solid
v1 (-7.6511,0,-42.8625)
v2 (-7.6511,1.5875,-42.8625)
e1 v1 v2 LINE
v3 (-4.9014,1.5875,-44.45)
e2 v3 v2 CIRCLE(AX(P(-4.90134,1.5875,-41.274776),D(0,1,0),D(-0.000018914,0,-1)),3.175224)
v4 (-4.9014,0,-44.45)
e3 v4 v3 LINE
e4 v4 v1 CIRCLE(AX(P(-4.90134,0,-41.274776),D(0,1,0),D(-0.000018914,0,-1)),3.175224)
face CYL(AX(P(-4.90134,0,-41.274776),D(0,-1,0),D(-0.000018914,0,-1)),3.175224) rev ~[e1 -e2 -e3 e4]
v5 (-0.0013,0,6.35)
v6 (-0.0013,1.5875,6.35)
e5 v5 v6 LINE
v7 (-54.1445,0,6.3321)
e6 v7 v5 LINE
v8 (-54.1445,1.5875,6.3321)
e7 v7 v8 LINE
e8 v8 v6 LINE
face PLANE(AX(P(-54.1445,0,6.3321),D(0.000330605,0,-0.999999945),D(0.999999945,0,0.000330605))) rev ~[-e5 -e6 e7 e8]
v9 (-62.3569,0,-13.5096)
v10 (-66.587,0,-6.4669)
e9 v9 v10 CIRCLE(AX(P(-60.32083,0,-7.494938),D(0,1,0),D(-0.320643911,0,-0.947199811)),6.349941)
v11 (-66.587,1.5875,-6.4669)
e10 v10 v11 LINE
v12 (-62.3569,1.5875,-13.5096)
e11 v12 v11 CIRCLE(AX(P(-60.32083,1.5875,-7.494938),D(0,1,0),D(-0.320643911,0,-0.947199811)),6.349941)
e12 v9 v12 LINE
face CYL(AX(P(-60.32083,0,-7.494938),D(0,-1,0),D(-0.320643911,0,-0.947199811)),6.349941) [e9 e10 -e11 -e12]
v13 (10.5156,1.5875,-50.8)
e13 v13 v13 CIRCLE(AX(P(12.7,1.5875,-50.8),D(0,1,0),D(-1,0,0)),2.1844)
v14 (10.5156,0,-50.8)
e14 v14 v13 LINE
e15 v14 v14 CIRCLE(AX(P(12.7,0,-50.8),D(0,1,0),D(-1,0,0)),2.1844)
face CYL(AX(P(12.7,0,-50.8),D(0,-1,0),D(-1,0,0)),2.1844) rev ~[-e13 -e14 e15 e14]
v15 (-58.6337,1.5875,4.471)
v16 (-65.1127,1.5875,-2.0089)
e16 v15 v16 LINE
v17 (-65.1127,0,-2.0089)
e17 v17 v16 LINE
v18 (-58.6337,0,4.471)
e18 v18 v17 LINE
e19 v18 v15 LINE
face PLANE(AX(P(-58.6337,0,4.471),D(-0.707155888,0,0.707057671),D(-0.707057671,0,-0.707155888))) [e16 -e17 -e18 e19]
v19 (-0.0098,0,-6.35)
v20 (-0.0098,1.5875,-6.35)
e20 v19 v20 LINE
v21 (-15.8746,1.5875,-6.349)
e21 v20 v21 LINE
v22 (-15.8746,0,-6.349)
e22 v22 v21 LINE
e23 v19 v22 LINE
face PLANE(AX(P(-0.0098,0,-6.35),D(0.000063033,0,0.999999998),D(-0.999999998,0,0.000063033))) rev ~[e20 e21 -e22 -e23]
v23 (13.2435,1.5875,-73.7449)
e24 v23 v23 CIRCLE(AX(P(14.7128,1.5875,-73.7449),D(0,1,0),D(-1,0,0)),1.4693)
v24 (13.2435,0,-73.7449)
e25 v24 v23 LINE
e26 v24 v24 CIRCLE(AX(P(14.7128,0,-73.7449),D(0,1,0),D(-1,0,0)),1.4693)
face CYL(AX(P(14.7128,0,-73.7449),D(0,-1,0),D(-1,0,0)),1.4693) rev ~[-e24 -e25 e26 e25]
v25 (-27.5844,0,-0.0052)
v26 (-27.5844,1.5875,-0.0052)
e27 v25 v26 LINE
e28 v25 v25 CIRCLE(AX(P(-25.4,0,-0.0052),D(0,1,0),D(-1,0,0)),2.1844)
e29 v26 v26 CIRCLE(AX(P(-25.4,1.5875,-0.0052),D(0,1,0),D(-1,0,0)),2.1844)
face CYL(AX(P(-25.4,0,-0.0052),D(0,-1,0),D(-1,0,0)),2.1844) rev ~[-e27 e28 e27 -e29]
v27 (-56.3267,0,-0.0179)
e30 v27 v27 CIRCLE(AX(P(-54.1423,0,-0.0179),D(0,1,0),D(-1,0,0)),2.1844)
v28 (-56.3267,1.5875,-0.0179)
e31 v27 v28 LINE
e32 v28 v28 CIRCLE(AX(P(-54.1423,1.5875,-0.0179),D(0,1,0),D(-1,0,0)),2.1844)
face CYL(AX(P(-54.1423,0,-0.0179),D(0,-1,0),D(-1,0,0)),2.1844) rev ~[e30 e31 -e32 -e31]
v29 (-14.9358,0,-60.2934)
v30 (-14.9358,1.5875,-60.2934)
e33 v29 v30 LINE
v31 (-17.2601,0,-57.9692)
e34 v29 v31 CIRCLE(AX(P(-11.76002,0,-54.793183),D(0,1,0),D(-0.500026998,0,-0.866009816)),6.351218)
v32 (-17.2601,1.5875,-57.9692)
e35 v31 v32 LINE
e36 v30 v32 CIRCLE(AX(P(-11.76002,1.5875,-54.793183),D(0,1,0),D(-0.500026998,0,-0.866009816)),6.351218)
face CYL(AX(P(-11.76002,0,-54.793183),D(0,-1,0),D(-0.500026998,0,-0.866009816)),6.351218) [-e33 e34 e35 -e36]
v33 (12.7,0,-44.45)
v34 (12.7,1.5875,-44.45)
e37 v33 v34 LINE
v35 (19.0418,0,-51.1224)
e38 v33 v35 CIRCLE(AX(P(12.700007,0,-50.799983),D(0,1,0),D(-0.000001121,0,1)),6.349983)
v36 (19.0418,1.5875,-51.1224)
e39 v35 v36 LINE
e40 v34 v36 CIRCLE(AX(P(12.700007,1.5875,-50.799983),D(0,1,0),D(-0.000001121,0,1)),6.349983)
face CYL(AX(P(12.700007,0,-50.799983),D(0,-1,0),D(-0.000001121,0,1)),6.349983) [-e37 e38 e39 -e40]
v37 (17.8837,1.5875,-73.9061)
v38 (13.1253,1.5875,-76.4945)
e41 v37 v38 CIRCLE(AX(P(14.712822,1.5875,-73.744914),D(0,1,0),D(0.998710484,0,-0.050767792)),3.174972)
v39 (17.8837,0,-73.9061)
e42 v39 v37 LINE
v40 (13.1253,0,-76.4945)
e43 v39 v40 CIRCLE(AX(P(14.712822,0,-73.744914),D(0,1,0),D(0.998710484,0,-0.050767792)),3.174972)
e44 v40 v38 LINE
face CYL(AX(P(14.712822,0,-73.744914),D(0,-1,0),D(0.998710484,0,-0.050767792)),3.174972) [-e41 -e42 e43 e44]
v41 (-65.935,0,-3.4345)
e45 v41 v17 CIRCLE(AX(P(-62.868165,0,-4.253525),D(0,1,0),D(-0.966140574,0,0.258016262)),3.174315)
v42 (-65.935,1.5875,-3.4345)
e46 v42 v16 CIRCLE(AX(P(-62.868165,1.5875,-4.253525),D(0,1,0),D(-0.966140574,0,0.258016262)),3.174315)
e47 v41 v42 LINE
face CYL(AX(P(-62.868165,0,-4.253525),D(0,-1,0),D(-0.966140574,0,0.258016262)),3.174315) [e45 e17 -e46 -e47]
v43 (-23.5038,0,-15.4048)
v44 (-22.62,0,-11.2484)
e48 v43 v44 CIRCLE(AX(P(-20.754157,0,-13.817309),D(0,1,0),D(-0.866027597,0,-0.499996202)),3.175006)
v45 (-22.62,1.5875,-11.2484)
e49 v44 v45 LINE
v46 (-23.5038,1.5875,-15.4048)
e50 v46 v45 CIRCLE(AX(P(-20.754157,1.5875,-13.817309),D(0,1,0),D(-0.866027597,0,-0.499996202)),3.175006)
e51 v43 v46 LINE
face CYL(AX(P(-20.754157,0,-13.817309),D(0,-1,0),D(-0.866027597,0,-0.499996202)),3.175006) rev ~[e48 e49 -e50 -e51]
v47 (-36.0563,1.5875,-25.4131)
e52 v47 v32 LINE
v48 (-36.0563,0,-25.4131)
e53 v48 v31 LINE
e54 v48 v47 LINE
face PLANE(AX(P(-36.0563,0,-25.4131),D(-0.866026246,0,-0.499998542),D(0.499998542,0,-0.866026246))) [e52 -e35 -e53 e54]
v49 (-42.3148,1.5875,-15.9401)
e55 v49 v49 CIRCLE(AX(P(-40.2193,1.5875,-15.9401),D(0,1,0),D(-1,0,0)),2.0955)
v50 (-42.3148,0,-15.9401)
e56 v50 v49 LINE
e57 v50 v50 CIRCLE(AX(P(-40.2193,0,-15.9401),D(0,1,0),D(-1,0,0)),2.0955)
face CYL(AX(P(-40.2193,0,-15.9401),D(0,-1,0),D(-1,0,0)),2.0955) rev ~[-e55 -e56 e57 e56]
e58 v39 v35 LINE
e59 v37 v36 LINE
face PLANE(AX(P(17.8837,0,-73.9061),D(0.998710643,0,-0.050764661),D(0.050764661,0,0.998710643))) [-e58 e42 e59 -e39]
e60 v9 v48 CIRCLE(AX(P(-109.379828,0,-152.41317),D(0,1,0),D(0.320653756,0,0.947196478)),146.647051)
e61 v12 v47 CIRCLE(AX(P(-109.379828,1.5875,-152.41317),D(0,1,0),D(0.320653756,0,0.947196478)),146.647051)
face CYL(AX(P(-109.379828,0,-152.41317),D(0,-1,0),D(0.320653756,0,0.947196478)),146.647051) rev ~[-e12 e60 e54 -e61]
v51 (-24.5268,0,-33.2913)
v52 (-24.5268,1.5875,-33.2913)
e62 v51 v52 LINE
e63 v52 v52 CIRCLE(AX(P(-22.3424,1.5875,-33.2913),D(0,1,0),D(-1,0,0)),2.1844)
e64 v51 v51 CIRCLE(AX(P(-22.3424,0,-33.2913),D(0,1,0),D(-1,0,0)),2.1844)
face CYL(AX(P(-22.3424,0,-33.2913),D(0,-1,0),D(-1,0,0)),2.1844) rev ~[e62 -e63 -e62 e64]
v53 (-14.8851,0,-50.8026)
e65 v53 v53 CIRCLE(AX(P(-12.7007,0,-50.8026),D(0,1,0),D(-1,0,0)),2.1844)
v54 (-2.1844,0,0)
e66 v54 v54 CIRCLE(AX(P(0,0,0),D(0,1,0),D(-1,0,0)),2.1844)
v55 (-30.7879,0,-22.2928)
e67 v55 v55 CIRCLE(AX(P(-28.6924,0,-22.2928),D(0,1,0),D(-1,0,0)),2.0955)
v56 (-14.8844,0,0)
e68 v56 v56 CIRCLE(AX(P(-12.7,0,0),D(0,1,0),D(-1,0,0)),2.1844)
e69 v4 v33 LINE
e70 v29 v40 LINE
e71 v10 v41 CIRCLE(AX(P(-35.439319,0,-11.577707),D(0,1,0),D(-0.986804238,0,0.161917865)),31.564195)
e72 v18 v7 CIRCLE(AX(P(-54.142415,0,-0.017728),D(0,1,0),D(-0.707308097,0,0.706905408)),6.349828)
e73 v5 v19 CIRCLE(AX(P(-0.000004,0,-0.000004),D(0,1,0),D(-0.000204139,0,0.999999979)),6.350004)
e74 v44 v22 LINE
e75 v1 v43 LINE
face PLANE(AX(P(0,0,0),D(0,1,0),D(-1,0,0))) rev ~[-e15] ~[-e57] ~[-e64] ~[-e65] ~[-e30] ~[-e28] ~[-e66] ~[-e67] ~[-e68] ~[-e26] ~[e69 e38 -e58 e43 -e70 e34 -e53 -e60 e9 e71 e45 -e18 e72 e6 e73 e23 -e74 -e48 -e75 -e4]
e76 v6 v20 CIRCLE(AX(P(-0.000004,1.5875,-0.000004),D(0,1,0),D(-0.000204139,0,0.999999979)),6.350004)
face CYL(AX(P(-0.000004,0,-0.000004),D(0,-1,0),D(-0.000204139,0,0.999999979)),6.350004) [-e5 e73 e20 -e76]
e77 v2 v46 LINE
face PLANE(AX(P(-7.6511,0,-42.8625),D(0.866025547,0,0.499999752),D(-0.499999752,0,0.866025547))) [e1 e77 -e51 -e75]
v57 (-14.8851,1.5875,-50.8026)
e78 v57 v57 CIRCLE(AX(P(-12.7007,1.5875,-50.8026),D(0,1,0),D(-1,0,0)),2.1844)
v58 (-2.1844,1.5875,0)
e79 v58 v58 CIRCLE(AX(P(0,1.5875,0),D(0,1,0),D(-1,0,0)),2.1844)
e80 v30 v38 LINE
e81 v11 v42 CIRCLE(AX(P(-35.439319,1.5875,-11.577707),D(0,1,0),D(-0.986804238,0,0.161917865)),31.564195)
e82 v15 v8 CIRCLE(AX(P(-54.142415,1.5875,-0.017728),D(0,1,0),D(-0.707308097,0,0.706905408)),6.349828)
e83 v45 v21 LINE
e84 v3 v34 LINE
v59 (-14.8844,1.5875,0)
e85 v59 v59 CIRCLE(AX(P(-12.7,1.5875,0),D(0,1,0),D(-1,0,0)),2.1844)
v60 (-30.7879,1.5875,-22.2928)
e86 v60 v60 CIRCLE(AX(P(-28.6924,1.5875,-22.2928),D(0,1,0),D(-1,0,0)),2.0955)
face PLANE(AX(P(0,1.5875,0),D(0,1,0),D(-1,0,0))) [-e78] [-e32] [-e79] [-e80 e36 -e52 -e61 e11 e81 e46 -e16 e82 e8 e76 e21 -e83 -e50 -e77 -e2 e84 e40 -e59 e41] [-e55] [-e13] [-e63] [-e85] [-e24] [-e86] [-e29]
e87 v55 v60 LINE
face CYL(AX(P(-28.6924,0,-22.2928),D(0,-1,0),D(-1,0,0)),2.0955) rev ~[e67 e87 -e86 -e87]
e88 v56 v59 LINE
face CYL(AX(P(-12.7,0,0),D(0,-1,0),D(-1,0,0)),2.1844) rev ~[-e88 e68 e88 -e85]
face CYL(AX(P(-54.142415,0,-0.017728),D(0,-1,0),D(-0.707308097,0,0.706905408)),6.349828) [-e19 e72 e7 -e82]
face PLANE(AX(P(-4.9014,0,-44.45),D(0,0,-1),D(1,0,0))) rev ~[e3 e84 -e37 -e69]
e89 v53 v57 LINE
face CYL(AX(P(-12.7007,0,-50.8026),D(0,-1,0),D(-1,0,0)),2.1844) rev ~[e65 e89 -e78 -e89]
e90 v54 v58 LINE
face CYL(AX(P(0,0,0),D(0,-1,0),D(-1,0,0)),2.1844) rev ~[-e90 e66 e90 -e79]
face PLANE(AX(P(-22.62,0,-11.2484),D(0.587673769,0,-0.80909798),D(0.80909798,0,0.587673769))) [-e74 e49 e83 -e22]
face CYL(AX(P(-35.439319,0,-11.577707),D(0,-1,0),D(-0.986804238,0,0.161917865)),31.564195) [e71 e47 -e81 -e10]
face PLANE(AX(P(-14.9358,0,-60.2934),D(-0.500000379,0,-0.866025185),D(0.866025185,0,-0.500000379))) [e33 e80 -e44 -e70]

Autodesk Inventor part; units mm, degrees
ref_plane "YZ Plane" through (0, 0, 0) normal (1, 0, 0) x (0, 1, 0)
ref_plane "XZ Plane" through (0, 0, 0) normal (0, 1, 0) x (-1, 0, 0)
ref_plane "XY Plane" through (0, 0, 0) normal (0, 0, 1) x (1, 0, 0)
sketch "main" plane through (0, 0, 0) normal (0, 0, 1) x (1, 0, 0)
  circle A0 centre (36.4896, 64.2776) radius 2.1844
  line L0 (36.4904, 70.6276) -> (-17.6528, 70.6344)
  circle A1 centre (7.7473, 64.2844) radius 2.1844
  line L1 (-17.6416, 57.9344) -> (-1.7768, 57.9386)
  arc A2 (-17.6528, 70.6344) -> (-17.6416, 57.9344) centre (-17.6528, 64.2844) ccw
  circle A3 centre (-17.6528, 64.2844) radius 2.1844
  arc A4 (40.98, 68.7674) -> (36.4904, 70.6276) centre (36.4896, 64.2776) ccw
  line L2 (40.98, 68.7674) -> (49.8505, 68.7674) construction
  circle A5 centre (-4.9416, 13.4844) radius 2.1844
  circle A6 centre (-4.9528, 64.287) radius 2.1844
  point P0 (10.5119, 26.5593)
  point P1 (34.4277, 26.6577)
  dimension "d2" = 4.3688
  dimension "d3" = 4.3688
  dimension "d13" = 6.35
  dimension "d78" = 4.3688
sketch "mogo" plane through (0, 0, 0) normal (0, 0, 1) x (1, 0, 0)
  line L0 (-61.3822, 498.7735) -> (65.6178, 572.097)
  line L1 (65.6178, 572.097) -> (192.6178, 498.7735)
  line L2 (192.6178, 498.7735) -> (192.6178, 352.1265)
  line L3 (192.6178, 352.1265) -> (65.6178, 278.803)
  line L4 (65.6178, 278.803) -> (-61.3822, 352.1265)
  line L5 (-61.3822, 352.1265) -> (-61.3822, 498.7735)
  point P0 (65.6178, 425.45)
  point P1 (65.6178, 425.45)
  dimension "d59" = 254
sketch "Sketch1" plane through (0, 0, 0) normal (0, 1, 0) x (-1, 0, 0)
  line L0 (58.6337, 4.471) -> (65.1127, -2.0089)
  arc A0 (65.935, -3.4345) -> (65.1127, -2.0089) centre (62.8675, -4.2538) ccw
  circle A1 centre (22.3424, -33.2913) radius 2.1844
  arc A2 (66.587, -6.4669) -> (65.935, -3.4345) centre (35.461, -11.5736) ccw
  arc A3 (62.3569, -13.5096) -> (66.587, -6.4669) centre (60.3208, -7.4949) ccw
  line L1 (31.7488, -5.4171) -> (31.751, 4.6095) projected
  arc A4 (62.3569, -13.5096) -> (36.0563, -25.4131) centre (109.3798, -152.4131) ccw
  line L2 (36.0563, -25.4131) -> (17.2601, -57.9692)
  line L3 (7.6511, -42.8625) -> (23.5038, -15.4048)
  line L4 (49.7771, -4.633) -> (49.6408, -4.4967)
  line L5 (4.9014, -44.45) -> (-12.7, -44.45)
  line L6 (-17.8837, -73.9061) -> (-19.0418, -51.1224)
  line L7 (14.9358, -60.2934) -> (-13.1253, -76.4945)
  circle A5 centre (-12.7, -50.8) radius 2.1844
  arc A6 (-12.7, -44.45) -> (-19.0418, -51.1224) centre (-12.7, -50.8) ccw
  arc A7 (-17.8837, -73.9061) -> (-13.1253, -76.4945) centre (-14.7128, -73.7449) ccw
  circle A8 centre (-14.7128, -73.7449) radius 1.4693
  arc A9 (14.9358, -60.2934) -> (17.2601, -57.9692) centre (11.7608, -54.7942) ccw
  circle A10 centre (28.6924, -22.2928) radius 2.0955
  line L8 (22.62, -11.2484) -> (15.8746, -6.349)
  arc A11 (23.5038, -15.4048) -> (22.62, -11.2484) centre (20.7541, -13.8173) ccw
  circle A12 centre (40.2193, -15.9401) radius 2.0955
  arc A13 (4.9014, -44.45) -> (7.6511, -42.8625) centre (4.9014, -41.275) ccw
  circle A14 centre (54.1423, -0.0179) radius 2.1844
  line L9 (54.1445, 6.3321) -> (0.0013, 6.35)
  circle A15 centre (25.4, -0.0052) radius 2.1844
  line L10 (0.0098, -6.35) -> (15.8746, -6.349)
  arc A16 (0.0013, 6.35) -> (0.0098, -6.35) centre (0, 0) ccw
  circle A17 centre (0, 0) radius 2.1844
  arc A18 (58.6337, 4.471) -> (54.1445, 6.3321) centre (54.1423, -0.0179) ccw
  line L11 (58.6337, 4.471) -> (67.5042, 4.4692) construction
  circle A19 centre (12.7007, -50.8026) radius 2.1844
  circle A20 centre (12.7, 0) radius 2.1844
  point P0 (0, 0)
  point P1 (65.6981, -2.5943)
  point P2 (58.6337, 4.471)
  point P3 (-17.6202, -79.0897)
  point P4 (16.4093, -59.4427)
  point P5 (15.8746, -6.349)
  dimension "d41" = 3.175
  dimension "d54" = 4.3688
  dimension "d60" = 6.35
  dimension "d64" = 15.875
  dimension "d65" = 4.3688
  dimension "d66" = 12.7
  dimension "d67" = 3.175
  dimension "d68" = 6.35
  dimension "d69" = 4.191
  dimension "d70" = 7.9375
  dimension "d71" = 12.7
  dimension "d72" = 7.9375
  dimension "d75" = 3.175
  dimension "d76" = 4.191
  dimension "d77" = 3.175
extrude "Extrusion1" add sketch "Sketch1" along normal blind 1.5875
properties part number "Funnel Gusset Back Improved V2" material "Acetal Resin, White"
